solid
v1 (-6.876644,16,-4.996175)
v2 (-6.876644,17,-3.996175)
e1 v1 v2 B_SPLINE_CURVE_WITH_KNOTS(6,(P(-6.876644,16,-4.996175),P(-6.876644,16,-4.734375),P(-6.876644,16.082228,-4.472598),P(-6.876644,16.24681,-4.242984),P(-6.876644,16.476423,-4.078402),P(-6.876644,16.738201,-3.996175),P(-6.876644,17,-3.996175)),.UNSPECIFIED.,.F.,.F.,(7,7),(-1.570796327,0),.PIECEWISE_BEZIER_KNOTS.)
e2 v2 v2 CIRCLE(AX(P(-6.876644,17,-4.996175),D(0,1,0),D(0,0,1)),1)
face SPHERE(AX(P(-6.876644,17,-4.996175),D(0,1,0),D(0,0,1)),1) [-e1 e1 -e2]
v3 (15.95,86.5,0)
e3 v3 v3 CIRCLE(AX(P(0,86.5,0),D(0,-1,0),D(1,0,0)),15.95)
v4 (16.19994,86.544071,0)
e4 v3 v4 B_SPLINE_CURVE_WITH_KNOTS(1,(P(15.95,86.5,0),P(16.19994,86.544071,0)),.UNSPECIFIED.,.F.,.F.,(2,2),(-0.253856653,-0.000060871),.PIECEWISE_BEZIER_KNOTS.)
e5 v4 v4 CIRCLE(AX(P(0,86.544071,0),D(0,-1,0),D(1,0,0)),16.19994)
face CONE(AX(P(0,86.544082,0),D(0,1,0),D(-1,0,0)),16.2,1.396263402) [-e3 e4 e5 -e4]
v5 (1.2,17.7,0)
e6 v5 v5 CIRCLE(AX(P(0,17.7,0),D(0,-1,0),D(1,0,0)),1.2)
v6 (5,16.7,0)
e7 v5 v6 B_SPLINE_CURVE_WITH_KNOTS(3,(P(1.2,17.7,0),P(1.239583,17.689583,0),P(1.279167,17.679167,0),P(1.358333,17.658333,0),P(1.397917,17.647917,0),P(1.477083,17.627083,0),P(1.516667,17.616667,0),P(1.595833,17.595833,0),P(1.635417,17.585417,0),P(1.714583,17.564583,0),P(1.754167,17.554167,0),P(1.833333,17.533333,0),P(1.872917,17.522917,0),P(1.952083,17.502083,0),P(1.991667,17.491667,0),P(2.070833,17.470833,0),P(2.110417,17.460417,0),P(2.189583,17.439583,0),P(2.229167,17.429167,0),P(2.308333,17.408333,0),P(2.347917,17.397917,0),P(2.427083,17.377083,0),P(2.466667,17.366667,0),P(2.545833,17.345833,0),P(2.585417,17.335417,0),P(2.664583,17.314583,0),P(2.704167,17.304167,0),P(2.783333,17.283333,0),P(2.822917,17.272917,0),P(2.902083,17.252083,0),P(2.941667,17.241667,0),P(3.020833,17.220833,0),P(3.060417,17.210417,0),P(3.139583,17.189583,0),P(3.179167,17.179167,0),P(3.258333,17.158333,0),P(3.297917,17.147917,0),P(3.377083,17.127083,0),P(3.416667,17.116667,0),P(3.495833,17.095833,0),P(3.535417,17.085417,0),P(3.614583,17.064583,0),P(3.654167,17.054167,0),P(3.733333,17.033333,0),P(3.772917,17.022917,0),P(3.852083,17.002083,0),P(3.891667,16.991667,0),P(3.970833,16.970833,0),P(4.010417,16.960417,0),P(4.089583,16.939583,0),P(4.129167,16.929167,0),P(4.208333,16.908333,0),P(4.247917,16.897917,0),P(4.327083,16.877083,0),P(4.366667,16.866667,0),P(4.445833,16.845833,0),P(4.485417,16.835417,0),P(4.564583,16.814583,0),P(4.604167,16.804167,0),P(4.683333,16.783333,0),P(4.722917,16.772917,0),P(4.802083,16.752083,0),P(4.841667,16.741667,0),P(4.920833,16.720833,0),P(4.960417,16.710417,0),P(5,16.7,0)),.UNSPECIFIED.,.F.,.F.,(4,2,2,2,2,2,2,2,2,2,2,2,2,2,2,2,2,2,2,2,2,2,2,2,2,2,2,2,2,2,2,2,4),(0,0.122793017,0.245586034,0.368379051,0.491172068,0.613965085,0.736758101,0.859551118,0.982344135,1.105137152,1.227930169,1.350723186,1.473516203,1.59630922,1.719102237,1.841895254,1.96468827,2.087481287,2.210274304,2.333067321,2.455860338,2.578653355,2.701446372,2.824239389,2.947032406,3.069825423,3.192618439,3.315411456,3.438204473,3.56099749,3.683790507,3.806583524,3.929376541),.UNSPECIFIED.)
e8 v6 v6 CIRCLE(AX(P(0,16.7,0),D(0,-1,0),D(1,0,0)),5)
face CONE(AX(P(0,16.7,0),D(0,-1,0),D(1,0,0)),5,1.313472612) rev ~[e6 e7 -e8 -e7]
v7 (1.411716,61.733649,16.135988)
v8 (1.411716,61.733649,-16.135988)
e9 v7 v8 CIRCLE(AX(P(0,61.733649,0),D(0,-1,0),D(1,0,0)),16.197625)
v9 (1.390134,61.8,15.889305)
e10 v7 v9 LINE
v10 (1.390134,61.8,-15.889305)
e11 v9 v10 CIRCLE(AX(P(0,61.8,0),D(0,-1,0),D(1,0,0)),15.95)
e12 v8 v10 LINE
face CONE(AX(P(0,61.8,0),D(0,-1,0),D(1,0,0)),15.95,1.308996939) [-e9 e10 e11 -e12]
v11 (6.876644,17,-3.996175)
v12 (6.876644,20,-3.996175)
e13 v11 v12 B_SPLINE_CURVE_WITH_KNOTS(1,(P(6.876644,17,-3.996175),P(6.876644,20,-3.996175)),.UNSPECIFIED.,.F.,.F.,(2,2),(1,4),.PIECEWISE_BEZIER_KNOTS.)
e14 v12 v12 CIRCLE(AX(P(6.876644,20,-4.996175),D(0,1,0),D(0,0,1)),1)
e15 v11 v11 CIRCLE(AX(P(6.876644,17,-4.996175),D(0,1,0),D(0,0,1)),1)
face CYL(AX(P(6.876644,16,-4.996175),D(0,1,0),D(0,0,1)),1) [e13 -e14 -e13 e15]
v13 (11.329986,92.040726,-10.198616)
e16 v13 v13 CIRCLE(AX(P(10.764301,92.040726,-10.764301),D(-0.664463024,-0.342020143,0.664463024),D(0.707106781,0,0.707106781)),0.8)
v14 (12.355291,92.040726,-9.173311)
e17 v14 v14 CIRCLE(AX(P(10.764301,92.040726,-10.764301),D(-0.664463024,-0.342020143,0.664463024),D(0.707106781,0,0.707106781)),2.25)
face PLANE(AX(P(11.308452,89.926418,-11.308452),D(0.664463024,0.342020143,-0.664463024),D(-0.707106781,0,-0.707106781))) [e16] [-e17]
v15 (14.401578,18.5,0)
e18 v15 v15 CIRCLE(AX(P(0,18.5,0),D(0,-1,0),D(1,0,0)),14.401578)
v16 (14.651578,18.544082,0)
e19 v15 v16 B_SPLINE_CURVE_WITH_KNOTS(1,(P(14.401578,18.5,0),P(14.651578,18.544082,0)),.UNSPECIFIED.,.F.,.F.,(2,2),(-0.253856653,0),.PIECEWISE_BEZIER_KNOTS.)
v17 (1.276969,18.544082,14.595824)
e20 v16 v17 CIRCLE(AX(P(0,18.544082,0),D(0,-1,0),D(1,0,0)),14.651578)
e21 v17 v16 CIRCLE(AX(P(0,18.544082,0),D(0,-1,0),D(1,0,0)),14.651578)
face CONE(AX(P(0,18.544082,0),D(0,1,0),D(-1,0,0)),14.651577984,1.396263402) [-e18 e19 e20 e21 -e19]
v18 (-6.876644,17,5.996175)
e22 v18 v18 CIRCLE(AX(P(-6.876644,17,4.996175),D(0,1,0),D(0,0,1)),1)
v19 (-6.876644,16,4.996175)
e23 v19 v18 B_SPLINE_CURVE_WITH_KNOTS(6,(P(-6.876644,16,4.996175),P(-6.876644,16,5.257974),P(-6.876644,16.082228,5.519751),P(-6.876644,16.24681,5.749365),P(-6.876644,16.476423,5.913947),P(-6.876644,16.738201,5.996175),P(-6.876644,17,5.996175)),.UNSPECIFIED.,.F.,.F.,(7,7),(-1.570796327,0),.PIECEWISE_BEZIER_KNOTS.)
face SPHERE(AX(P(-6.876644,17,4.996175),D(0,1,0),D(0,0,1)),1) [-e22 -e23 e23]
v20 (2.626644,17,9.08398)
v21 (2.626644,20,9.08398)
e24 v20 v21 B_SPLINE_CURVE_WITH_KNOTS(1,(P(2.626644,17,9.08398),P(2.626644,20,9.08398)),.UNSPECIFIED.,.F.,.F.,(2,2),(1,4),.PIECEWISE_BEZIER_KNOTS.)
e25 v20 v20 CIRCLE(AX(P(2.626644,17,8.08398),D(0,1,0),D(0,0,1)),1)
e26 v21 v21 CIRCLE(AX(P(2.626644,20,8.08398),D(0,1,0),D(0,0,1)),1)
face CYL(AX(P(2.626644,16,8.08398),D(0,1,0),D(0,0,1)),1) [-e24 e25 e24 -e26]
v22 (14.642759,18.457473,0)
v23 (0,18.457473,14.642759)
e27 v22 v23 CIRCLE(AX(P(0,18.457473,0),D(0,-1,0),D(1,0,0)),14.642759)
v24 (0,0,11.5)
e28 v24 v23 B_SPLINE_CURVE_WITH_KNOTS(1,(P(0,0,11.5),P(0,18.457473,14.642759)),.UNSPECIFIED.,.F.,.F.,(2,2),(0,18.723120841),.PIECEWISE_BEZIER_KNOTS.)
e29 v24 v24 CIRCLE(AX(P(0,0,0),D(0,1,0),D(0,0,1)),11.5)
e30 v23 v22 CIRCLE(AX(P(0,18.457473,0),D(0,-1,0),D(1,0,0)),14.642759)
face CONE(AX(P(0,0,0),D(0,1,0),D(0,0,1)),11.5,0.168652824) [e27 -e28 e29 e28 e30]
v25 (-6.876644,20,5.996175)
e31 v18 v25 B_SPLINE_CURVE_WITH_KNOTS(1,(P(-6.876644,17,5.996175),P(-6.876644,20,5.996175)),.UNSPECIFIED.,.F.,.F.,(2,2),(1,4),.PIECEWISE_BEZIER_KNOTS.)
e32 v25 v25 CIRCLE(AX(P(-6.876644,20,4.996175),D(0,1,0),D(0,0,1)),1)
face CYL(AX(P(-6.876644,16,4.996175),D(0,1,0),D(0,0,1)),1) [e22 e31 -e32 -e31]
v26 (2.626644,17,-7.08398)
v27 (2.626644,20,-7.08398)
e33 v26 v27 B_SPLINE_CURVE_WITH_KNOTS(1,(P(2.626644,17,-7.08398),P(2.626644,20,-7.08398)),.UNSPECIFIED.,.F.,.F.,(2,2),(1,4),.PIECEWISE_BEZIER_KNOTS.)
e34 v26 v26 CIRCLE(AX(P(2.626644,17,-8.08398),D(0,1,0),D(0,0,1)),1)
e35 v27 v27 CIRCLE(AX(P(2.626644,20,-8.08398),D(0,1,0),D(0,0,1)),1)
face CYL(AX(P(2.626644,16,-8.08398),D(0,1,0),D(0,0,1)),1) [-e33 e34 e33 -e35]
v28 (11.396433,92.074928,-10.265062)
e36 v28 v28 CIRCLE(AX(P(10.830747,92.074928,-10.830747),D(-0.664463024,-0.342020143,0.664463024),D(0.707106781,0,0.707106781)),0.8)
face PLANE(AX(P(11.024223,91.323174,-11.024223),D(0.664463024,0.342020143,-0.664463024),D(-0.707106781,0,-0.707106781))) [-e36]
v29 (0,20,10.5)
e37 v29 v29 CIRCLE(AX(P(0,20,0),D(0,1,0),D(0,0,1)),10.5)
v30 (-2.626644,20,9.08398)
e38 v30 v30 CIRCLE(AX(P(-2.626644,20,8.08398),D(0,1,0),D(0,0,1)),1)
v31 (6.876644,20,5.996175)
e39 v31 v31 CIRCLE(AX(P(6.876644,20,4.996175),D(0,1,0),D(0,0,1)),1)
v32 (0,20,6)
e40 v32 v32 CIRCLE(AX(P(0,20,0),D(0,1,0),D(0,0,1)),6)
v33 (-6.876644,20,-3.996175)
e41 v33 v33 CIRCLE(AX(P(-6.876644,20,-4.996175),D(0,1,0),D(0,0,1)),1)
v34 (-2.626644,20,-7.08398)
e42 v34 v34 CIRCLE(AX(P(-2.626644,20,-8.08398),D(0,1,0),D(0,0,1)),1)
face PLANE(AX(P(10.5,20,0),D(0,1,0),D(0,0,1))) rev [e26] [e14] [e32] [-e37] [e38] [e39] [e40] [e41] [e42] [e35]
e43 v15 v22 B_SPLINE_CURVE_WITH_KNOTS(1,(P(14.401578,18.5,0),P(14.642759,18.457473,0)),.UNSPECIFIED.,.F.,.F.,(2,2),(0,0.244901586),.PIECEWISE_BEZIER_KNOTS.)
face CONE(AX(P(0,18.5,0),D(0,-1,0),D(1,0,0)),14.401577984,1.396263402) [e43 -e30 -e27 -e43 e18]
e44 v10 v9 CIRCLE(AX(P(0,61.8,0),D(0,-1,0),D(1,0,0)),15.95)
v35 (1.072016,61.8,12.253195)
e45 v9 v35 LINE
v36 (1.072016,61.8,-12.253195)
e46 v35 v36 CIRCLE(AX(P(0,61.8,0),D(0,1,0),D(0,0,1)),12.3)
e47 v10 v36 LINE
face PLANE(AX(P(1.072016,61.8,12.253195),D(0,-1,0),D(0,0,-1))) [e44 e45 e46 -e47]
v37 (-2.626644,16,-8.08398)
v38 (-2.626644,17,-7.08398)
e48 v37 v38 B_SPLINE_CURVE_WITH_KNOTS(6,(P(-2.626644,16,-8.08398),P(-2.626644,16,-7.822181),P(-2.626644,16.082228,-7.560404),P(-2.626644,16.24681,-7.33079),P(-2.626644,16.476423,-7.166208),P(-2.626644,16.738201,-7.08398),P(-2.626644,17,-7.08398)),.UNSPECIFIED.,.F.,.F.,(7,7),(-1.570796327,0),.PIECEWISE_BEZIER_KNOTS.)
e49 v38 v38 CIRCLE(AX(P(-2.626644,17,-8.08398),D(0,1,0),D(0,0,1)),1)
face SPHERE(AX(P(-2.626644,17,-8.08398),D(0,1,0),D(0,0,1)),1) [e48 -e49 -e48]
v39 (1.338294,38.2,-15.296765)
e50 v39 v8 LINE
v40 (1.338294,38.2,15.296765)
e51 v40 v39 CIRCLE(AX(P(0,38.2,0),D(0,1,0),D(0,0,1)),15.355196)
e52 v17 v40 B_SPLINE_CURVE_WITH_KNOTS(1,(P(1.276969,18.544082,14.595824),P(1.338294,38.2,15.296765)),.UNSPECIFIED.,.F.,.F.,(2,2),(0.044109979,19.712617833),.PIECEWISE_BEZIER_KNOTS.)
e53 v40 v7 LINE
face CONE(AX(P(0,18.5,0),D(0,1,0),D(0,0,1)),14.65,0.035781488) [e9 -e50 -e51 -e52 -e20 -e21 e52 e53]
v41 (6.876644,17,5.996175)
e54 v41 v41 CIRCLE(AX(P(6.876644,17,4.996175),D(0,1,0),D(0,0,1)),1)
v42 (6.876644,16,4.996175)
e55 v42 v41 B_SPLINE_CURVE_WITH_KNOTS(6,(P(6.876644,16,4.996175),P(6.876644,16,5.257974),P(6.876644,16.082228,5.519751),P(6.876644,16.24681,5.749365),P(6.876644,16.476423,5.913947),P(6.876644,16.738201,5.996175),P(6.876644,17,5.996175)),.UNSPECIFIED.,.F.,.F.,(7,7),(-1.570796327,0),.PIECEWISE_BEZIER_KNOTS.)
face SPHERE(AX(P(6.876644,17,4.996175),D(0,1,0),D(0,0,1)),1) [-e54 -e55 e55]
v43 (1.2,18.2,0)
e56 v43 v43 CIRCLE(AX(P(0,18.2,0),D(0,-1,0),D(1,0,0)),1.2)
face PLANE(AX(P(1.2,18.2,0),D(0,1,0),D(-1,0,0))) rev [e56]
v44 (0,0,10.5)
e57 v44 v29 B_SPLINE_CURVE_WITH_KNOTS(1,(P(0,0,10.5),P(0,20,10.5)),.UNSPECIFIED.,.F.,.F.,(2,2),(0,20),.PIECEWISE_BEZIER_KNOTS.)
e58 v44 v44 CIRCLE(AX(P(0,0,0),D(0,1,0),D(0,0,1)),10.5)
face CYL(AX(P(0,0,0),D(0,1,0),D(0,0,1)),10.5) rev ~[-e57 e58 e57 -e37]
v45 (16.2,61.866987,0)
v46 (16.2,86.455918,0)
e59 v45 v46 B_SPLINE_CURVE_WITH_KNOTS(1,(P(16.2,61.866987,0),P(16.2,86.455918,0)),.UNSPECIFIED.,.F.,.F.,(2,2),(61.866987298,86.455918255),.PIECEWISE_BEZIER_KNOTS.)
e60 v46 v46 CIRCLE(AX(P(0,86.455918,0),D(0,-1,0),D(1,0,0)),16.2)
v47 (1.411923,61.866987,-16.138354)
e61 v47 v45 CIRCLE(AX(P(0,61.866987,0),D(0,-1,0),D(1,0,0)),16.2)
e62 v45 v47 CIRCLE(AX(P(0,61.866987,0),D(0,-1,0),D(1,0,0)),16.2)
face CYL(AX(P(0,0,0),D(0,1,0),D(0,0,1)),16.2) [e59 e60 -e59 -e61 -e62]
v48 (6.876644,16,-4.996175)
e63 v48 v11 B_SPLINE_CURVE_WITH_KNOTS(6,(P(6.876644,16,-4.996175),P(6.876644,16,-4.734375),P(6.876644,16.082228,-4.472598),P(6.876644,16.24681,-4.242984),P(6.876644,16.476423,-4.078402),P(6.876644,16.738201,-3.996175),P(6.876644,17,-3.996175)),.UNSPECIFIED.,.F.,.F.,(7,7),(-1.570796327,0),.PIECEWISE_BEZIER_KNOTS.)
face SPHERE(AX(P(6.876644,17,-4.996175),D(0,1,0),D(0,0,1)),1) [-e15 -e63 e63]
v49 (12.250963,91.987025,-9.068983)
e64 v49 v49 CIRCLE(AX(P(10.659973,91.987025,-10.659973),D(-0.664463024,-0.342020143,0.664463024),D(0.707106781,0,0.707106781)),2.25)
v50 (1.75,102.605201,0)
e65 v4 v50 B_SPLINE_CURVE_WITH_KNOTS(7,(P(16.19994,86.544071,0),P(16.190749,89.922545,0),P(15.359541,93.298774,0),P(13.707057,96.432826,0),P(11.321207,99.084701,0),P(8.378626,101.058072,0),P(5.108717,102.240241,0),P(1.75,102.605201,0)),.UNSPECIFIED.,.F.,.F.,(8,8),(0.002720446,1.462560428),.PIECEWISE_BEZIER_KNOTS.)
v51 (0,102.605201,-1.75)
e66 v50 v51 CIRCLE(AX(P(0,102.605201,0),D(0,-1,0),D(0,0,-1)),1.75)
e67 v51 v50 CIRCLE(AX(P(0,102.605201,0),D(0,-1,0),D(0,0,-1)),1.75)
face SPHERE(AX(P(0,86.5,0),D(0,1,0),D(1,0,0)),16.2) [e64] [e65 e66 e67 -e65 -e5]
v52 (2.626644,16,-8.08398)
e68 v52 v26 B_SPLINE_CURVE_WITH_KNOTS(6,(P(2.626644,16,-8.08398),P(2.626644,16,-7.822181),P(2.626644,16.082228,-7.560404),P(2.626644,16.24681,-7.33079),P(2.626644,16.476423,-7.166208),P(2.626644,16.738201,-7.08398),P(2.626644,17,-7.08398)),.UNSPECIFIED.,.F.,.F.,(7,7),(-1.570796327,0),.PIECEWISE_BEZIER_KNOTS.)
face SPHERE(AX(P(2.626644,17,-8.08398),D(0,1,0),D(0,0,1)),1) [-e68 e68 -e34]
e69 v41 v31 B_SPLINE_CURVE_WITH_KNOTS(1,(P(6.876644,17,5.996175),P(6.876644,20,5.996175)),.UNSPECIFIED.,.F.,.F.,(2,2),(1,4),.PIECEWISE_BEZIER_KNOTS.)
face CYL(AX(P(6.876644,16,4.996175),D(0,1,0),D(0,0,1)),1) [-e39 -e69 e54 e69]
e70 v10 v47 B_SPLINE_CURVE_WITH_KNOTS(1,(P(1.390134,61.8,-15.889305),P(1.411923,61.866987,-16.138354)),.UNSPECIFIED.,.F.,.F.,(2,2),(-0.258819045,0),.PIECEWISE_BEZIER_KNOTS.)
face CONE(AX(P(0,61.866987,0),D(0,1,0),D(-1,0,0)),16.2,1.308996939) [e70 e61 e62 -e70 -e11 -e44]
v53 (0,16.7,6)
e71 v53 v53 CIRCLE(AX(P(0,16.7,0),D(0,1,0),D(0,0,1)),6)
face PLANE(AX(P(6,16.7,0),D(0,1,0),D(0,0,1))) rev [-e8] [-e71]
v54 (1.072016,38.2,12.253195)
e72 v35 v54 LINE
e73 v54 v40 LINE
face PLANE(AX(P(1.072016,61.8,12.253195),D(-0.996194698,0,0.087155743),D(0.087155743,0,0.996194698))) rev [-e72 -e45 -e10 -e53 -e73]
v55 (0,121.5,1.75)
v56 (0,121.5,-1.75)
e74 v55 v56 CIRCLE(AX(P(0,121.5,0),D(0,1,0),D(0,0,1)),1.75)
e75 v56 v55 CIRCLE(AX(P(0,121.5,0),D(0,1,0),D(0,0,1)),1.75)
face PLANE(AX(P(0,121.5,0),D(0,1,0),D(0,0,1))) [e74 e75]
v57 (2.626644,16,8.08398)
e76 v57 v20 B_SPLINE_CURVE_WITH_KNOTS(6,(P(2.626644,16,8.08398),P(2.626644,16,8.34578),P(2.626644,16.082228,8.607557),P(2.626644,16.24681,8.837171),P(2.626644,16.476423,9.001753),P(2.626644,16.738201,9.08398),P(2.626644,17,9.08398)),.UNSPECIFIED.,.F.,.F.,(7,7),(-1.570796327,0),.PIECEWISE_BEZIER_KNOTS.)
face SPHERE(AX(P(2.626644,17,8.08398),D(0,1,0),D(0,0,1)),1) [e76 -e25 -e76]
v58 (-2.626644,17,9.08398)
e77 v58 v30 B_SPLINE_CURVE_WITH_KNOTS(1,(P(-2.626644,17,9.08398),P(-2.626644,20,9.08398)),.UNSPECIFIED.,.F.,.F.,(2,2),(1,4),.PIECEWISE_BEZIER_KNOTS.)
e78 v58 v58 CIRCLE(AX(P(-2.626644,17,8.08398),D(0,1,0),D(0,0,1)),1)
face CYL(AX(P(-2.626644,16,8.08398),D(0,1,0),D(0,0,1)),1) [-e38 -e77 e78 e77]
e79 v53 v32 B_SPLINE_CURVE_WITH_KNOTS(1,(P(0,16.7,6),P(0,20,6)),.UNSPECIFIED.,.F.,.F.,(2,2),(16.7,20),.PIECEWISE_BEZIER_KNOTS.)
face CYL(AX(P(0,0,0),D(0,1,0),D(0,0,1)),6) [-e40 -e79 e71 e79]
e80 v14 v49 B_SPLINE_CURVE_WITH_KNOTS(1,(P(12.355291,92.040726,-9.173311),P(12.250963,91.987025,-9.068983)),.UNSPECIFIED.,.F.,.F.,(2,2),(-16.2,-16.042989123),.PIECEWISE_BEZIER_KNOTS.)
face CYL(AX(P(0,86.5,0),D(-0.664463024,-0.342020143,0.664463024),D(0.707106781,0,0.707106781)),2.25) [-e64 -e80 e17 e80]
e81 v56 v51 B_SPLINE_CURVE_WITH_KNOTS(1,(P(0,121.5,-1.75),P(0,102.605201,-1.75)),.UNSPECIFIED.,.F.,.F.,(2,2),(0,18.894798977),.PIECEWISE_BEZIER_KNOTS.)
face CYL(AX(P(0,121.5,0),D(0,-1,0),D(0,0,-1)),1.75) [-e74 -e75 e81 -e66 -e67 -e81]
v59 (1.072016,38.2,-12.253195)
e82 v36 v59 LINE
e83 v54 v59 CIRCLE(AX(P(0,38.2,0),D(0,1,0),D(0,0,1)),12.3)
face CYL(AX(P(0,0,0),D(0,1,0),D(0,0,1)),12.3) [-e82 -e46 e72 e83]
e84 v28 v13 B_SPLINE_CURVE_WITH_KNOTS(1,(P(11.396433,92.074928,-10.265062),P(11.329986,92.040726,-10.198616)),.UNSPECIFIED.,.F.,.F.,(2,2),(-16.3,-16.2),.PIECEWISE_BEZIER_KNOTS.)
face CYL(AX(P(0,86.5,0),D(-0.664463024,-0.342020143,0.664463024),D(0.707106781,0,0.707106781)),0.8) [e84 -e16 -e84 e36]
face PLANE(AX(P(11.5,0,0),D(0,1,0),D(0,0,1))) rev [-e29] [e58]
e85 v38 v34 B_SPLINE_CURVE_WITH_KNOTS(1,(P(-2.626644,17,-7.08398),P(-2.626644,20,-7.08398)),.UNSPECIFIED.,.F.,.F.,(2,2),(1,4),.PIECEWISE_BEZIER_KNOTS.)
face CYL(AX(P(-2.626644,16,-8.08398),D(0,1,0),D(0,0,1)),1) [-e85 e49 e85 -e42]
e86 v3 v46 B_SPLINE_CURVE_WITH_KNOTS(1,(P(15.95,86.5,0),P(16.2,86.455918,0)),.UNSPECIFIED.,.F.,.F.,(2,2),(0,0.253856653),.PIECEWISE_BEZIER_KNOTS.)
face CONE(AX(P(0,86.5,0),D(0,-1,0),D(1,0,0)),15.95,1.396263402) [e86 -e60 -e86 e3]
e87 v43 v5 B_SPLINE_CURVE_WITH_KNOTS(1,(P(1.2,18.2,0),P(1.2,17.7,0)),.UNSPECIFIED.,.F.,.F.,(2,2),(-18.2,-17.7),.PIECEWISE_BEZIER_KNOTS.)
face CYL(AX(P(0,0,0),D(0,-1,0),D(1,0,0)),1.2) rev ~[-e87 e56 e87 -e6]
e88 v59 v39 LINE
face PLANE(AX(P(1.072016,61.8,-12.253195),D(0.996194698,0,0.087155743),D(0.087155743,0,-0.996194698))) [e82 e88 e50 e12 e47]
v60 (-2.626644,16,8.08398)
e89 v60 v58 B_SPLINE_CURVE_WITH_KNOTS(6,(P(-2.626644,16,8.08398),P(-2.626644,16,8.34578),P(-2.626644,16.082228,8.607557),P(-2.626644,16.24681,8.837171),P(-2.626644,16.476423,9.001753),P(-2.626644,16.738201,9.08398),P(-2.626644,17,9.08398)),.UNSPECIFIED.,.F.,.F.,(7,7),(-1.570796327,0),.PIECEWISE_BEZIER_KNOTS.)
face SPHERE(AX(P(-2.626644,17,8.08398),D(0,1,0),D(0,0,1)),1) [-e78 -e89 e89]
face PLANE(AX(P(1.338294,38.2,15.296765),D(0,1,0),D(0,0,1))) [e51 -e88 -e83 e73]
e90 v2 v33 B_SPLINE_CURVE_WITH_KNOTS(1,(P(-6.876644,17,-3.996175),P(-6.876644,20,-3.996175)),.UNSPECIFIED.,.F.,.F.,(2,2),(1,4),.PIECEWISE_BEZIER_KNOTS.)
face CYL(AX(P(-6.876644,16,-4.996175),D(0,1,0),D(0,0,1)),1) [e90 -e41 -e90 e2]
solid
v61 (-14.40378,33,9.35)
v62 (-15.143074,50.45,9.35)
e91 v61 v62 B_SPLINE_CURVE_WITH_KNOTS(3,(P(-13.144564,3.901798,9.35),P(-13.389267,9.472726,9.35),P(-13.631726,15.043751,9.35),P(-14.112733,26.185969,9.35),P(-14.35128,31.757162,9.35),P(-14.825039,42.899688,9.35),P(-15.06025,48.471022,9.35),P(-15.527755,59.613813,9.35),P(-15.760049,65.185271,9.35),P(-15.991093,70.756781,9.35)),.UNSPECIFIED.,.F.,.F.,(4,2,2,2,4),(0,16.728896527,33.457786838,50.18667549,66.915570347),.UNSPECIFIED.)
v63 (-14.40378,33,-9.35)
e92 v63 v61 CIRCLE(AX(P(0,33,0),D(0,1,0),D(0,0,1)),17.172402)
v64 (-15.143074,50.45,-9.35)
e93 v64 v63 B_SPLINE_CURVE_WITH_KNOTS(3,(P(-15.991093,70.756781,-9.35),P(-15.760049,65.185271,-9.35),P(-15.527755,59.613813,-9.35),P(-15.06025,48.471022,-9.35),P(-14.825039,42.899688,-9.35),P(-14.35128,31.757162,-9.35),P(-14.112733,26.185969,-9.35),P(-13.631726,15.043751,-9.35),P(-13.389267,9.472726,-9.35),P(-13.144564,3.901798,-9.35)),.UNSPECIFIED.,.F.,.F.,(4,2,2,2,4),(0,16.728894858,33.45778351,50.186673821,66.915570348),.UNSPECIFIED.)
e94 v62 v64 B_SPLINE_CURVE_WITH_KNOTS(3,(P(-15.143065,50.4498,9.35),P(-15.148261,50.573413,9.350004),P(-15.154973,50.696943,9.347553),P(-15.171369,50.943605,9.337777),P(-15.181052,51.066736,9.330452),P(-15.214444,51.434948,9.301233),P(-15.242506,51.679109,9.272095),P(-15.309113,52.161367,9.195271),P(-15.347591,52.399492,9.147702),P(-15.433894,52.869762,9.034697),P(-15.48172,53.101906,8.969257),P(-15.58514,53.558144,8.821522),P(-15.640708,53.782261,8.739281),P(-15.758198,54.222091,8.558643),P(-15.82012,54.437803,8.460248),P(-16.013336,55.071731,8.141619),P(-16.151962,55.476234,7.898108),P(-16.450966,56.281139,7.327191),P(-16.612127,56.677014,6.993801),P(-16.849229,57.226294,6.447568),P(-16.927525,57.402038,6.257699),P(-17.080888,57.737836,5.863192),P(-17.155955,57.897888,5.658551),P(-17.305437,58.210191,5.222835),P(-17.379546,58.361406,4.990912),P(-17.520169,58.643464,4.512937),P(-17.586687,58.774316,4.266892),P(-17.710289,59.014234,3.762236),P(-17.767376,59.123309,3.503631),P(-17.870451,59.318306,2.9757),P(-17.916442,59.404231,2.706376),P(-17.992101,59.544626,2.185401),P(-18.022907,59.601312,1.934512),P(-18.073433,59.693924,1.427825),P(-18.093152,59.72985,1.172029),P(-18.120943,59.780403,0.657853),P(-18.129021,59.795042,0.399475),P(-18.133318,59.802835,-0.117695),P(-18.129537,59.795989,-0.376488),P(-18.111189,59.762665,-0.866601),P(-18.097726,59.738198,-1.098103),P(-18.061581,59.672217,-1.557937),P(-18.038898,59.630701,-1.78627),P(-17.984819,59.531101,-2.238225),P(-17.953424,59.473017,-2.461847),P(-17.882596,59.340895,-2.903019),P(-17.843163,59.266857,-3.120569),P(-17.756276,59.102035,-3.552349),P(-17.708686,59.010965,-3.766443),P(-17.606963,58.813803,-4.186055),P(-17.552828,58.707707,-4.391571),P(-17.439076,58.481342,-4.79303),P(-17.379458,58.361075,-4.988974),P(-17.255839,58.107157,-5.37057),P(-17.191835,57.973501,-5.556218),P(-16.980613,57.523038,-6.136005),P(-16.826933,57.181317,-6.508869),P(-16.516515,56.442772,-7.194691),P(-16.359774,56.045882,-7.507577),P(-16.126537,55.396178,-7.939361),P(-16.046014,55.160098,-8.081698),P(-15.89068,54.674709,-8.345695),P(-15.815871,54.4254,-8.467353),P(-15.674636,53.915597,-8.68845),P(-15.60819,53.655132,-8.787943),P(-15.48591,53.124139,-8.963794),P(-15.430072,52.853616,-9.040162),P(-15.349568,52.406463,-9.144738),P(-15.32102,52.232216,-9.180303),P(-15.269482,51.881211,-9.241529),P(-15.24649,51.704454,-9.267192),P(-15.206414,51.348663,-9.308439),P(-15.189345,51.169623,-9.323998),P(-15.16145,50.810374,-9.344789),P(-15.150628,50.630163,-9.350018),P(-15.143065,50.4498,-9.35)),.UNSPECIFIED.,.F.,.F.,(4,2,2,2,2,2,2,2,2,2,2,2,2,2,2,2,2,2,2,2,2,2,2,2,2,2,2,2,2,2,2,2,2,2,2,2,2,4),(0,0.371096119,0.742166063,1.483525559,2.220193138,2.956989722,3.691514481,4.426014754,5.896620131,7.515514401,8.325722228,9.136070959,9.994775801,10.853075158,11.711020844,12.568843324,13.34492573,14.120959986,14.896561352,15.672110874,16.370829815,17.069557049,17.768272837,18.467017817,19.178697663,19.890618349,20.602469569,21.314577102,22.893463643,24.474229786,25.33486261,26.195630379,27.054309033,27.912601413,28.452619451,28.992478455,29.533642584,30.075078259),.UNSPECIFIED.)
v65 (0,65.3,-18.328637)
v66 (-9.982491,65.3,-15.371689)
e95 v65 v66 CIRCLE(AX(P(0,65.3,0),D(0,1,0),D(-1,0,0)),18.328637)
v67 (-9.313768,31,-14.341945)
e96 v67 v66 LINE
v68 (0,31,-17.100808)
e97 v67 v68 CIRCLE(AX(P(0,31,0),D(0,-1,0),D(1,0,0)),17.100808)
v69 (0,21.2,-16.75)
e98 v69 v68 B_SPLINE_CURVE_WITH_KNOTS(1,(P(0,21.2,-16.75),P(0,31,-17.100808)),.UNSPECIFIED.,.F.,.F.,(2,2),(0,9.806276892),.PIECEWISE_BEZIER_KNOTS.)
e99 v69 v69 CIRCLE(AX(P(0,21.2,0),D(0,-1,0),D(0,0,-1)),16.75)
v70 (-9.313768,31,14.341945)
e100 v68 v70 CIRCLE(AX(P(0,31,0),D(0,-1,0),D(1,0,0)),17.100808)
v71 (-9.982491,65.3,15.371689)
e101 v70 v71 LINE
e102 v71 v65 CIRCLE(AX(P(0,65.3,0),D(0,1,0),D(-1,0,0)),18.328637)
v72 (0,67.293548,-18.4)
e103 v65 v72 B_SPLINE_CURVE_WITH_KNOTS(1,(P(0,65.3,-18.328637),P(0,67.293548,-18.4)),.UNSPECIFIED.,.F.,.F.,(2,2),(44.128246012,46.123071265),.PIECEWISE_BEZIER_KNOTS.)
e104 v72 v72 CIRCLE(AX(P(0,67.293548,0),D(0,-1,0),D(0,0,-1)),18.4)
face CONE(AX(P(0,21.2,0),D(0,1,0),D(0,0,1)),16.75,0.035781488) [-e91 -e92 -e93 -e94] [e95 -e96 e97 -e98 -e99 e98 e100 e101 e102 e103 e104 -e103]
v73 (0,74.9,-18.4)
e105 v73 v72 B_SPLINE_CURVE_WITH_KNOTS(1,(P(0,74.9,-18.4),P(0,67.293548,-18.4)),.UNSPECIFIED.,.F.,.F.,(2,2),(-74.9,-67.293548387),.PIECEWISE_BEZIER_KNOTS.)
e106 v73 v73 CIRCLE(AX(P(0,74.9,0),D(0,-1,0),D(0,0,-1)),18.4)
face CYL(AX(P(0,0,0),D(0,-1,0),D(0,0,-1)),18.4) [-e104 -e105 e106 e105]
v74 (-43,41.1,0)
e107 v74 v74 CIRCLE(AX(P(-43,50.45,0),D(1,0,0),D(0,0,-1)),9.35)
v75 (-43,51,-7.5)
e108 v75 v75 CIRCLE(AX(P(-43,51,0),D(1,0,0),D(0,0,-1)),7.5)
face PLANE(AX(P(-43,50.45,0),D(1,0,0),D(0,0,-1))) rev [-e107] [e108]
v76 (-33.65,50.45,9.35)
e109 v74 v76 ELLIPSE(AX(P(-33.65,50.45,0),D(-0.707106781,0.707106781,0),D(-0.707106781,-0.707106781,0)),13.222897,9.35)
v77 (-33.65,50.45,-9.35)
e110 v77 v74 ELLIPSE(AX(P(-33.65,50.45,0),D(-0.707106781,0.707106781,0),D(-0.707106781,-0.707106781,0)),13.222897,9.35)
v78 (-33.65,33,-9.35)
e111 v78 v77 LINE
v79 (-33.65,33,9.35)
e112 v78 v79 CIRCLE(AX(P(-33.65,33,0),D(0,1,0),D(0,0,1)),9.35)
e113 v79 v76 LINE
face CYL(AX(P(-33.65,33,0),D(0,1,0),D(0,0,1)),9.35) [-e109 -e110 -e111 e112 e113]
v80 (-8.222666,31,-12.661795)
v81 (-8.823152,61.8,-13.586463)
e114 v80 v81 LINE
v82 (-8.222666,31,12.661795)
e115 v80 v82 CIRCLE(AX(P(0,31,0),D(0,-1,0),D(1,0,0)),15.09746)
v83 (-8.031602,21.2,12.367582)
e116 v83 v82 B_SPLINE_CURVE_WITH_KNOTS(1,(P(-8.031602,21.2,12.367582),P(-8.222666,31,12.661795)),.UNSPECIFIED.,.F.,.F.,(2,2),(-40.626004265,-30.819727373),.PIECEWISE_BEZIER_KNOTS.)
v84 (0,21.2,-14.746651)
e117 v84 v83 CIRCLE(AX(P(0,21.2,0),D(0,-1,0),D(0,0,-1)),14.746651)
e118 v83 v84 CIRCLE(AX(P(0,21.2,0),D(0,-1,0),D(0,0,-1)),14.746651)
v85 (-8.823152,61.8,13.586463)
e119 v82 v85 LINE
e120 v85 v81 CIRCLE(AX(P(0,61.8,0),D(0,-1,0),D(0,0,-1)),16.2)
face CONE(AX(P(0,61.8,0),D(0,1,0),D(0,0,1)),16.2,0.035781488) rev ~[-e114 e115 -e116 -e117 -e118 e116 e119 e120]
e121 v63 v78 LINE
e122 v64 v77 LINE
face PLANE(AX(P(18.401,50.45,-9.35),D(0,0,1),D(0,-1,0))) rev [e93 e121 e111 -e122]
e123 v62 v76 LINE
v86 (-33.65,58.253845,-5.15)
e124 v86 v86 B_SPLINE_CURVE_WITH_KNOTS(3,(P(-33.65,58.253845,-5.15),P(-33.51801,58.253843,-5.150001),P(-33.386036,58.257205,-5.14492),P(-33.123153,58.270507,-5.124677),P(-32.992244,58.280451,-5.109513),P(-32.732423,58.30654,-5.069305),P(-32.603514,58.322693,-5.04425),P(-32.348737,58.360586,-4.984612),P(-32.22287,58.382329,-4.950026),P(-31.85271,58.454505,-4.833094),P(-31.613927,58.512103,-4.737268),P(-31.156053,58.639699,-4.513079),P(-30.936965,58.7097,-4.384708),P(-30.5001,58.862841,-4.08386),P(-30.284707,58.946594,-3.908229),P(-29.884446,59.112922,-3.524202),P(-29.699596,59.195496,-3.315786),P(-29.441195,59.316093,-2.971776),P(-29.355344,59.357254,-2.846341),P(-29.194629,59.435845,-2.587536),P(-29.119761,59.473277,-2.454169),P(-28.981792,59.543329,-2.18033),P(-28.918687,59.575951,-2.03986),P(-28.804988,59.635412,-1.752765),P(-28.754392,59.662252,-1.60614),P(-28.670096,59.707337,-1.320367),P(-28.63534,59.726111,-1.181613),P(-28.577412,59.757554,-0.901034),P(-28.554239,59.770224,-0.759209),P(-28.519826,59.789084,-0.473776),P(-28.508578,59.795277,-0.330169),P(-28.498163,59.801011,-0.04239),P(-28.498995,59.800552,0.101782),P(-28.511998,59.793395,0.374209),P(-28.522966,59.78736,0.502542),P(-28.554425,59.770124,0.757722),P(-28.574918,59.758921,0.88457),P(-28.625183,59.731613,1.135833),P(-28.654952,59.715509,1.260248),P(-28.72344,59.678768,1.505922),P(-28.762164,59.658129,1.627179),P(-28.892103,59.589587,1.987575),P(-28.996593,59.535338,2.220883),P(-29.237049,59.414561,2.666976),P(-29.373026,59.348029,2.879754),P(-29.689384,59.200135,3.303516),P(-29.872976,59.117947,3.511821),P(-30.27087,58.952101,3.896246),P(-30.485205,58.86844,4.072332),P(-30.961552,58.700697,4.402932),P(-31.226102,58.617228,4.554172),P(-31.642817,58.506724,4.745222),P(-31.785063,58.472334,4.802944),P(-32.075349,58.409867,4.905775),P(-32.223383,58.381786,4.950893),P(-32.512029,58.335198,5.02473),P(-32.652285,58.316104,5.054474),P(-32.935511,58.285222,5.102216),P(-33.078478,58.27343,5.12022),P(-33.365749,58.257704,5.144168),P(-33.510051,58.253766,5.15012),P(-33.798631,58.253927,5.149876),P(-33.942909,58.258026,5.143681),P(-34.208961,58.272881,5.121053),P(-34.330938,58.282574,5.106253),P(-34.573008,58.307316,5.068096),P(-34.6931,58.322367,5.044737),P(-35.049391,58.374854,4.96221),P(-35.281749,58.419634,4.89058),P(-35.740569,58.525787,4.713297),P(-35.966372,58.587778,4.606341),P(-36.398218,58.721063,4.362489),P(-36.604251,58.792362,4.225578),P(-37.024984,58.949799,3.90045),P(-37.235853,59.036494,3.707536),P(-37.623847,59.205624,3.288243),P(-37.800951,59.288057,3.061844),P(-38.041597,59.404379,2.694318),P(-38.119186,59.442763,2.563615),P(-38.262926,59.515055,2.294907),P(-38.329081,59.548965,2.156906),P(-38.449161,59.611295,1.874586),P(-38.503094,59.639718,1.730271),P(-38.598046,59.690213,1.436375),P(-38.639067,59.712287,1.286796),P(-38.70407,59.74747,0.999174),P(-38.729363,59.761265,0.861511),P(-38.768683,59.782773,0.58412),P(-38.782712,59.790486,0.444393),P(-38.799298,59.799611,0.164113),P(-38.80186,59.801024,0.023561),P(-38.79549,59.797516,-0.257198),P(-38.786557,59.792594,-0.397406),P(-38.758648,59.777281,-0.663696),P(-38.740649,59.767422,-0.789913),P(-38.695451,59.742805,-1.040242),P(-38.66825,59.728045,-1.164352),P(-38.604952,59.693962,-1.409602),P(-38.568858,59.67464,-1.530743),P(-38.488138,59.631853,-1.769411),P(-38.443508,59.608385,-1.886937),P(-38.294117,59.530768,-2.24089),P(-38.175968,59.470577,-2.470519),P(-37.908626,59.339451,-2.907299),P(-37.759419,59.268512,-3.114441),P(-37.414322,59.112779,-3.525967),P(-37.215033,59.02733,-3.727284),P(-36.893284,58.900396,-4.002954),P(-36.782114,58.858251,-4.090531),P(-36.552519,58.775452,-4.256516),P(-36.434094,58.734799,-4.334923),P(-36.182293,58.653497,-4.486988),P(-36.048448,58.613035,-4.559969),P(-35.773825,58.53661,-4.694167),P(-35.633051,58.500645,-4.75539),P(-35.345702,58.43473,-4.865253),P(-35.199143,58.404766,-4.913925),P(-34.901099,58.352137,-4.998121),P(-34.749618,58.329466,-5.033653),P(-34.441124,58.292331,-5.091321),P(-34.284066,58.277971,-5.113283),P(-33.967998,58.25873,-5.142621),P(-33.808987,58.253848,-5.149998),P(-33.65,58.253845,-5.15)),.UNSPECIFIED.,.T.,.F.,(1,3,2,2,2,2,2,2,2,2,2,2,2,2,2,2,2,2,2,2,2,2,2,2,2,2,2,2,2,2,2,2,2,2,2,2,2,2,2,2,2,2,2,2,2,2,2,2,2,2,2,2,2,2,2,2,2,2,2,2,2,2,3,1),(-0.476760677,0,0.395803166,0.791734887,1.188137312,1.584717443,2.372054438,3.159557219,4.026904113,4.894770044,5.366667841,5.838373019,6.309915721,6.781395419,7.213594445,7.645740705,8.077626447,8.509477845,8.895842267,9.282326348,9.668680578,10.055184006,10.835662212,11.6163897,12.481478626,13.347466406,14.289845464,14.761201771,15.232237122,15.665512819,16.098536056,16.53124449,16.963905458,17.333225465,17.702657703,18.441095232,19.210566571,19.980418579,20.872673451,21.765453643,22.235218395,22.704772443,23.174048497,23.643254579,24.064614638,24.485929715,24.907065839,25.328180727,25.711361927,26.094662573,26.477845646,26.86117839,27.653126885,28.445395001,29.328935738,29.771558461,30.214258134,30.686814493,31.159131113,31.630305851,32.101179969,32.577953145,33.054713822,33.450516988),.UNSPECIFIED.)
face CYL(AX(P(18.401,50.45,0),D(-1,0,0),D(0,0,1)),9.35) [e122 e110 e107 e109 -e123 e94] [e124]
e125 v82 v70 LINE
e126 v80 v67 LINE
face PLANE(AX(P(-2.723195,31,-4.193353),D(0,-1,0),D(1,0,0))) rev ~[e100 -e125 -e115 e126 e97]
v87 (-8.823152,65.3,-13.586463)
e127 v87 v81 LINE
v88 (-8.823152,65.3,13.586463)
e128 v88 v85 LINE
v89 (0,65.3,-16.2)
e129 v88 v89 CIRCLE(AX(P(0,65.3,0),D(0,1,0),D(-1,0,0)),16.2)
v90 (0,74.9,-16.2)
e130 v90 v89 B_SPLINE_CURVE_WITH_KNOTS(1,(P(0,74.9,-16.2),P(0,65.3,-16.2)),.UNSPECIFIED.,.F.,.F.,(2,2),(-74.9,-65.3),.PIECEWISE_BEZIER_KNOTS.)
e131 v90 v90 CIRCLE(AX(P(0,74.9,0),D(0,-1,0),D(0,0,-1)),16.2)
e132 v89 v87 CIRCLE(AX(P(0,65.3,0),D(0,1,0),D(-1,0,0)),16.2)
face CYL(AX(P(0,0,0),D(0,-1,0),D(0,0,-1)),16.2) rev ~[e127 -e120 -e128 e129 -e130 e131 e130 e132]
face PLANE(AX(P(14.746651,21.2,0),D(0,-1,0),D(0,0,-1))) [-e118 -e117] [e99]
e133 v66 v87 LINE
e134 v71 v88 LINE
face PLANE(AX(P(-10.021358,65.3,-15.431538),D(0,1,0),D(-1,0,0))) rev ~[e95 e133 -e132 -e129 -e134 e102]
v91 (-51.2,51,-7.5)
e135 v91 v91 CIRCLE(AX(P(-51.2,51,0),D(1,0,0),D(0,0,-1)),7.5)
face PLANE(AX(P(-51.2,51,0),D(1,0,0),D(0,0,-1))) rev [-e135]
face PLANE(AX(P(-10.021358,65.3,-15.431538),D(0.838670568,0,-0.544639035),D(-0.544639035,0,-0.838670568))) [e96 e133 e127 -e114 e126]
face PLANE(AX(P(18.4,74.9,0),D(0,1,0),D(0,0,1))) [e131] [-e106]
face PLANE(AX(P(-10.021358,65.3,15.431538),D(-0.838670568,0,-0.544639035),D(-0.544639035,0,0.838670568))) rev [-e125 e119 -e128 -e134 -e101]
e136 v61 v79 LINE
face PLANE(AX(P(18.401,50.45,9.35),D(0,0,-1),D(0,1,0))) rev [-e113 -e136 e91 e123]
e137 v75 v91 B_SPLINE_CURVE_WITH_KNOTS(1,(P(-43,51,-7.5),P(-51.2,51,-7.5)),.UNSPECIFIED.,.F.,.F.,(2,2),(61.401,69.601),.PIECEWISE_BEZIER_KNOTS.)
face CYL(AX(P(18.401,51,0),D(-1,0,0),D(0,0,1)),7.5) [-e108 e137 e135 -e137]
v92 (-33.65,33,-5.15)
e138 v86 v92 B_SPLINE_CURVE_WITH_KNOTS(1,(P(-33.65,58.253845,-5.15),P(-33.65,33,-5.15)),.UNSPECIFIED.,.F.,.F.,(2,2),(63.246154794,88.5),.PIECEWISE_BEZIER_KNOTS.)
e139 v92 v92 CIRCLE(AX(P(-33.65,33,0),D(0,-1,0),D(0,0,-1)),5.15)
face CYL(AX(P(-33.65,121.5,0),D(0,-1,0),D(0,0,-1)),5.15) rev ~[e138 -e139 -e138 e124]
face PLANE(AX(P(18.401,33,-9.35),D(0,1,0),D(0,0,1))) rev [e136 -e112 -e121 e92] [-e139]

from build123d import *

# Parameters (mm, degrees)
CUT_REVOLVE1_ANGLE       = 170
SKETCH10_R               = 1.75
BOSS_EXTRUDE3_DEPTH      = 35
SKETCH15_R               = 1
BOSS_EXTRUDE4_DEPTH      = 4
FILLET2_R                = 1
CIRPATTERN1_COUNT        = 10
FILLET2_OF_CIRPATTERN1_R = 1
SKETCH4_W                = 13.4
SKETCH4_H                = 34.3
CUT_REVOLVE2_ANGLE       = 246
BOSS_EXTRUDE1_REACH      = 139.371
FILLET1_R                = 9.35
SKETCH7_R                = 5.15
CUT_EXTRUDE1_DEPTH       = 101.099001055
BOSS_EXTRUDE2_REACH      = 143.227
SKETCH9_R                = 7.5


with BuildPart() as part:
    # Sketch1 → Revolve1 (revolve)
    with BuildSketch(Plane.XY, mode=Mode.PRIVATE) as revolve1_sk:
        with BuildLine():
            Line((11.5, 0), (14.65, 18.5))
            Line((14.65, 18.5), (16.2, 61.8))
            Line((16.2, 61.8), (16.2, 86.5))
            ThreePointArc((16.2, 86.5), (11.455129855, 97.955129855), (0, 102.7))
            Line((0, 102.7), (0, 16.7))
            Line((0, 16.7), (6, 16.7))
            Line((6, 16.7), (6, 20))
            Line((6, 20), (10.5, 20))
            Line((10.5, 20), (10.5, 0))
            Line((10.5, 0), (11.5, 0))
        make_face()
    revolve(revolve1_sk.sketch.rotate(Axis((0, 0, 0), (0, -1, 0)), 90), axis=Axis((0, 0, 0), (0, -1, 0)))

    # Sketch2 → Cut-Revolve1 (revolve, symmetric, cut)
    with BuildSketch(Plane.XY) as cut_revolve1_sk:
        Polygon((16.2, 61.8), (15.355196305, 38.2), (12.3, 38.2), (12.3, 61.8), align=None)
    revolve(axis=Axis((0, 0, 0), (0, -1, 0)), revolution_arc=CUT_REVOLVE1_ANGLE / 2, mode=Mode.SUBTRACT)
    revolve(cut_revolve1_sk.sketch, axis=Axis((0, 0, 0), (0, 1, 0)), revolution_arc=CUT_REVOLVE1_ANGLE / 2, mode=Mode.SUBTRACT)

    # Sketch10 → Boss-Extrude3 (add)
    with BuildSketch(Plane(origin=(0, 86.5, 0), x_dir=(1, 0, 0), z_dir=(0, 1, 0))):
        with Locations(Location((0, 0, 0), (0, 0, 270))):
            Circle(SKETCH10_R)
    extrude(amount=BOSS_EXTRUDE3_DEPTH)

    # Sketch12 → Cut-Revolve3 (revolve, cut)
    with BuildSketch(Plane.XY):
        Polygon((5, 16.7), (1.2, 17.7), (1.2, 18.2), (0, 18.2), (0, 16.7), align=None)
    revolve(axis=Axis((0, 0, 0), (0, 1, 0)), mode=Mode.SUBTRACT)

    # Sketch14 → Cut-Revolve4 (revolve, cut)
    with BuildSketch(Plane.XY):
        Polygon((16.2, 61.866987298), (15.95, 61.8), (16.2, 61.733012702), align=None)
        Polygon((14.651577984, 18.544081745), (14.401577984, 18.5), (14.651577984, 18.455918255), align=None)
        Polygon((16.2, 86.455918255), (15.95, 86.5), (16.2, 86.544081745), align=None)
    revolve(axis=Axis((0, 16.7, 0), (0, 1, 0)), mode=Mode.SUBTRACT)

    # Sketch15 → Boss-Extrude4 (add)
    with BuildSketch(Plane.XZ.offset(-20)):
        with Locations(Location((-6.876644452, -4.996174644, 0), (0, 0, 90))):
            Circle(SKETCH15_R)
    boss_extrude4 = extrude(amount=BOSS_EXTRUDE4_DEPTH)

    # Fillet2
    fillet2_edges = [part.edges().sort_by_distance(p)[0] for p in [
        (-6.876644452, 16, -5.996174644),
    ]]
    fillet(fillet2_edges, radius=FILLET2_R)

    # CirPattern1: Boss-Extrude4 ×10 about axis, 2 skipped
    cirpattern1_axis = Axis((0, -23.883118438, 0), (0, 1, 0))
    add([boss_extrude4.rotate(cirpattern1_axis, i * 360 / CIRPATTERN1_COUNT) for i in range(1, CIRPATTERN1_COUNT) if i not in (1, 6)])

    # Fillet2 of CirPattern1
    fillet2_of_cirpattern1_edges = [part.edges().sort_by_distance(p)[0] for p in [
        (-7.827700968, 16, 4.68715765),
        (-3.577700968, 16, 8.392997383),
        (2.0388592, 16, 8.892997383),
        (6.876644452, 16, 5.996174644),
        (7.827700968, 16, -4.68715765),
        (3.577700968, 16, -8.392997383),
        (-2.0388592, 16, -8.892997383),
    ]]
    fillet(fillet2_of_cirpattern1_edges, radius=FILLET2_OF_CIRPATTERN1_R)

    # Sketch11 → Revolve3 (revolve)
    with BuildSketch(Plane(origin=(0, 0, 0), x_dir=(0.7071067811865488, 0, -0.7071067811865464), z_dir=(0.7071067811865464, 0, 0.7071067811865488)), mode=Mode.PRIVATE) as revolve3_sk:
        Polygon((15.052873158, 89.584397782), (15.992565779, 89.926417925), (15.496636571, 91.288972225), (15.590605833, 91.32317424), (15.316989719, 92.074928336), (15.223020457, 92.040726322), (14.283327836, 91.698706179), align=None)
    revolve(revolve3_sk.sketch.rotate(Axis((0, 86.5, 0), (0.6644630243886773, 0.34202014332566283, -0.6644630243886751)), 270), axis=Axis((0, 86.5, 0), (0.6644630243886773, 0.34202014332566283, -0.6644630243886751)))


with BuildPart() as body_2:
    # Sketch3 → Revolve2 (revolve)
    with BuildSketch(Plane.XY, mode=Mode.PRIVATE) as revolve2_sk:
        Polygon((16.75, 21.2), (18.4, 67.293548387), (18.4, 74.9), (16.2, 74.9), (16.2, 61.8), (14.74665127, 21.2), align=None)
    revolve(revolve2_sk.sketch.rotate(Axis((0, 0, 0), (0, 1, 0)), 90), axis=Axis((0, 0, 0), (0, 1, 0)))

    # Sketch4 → Cut-Revolve2 (revolve, symmetric, cut)
    with BuildSketch(Plane.XY) as cut_revolve2_sk:
        with Locations((11.7, 48.15)):
            Rectangle(SKETCH4_W, SKETCH4_H)
    revolve(axis=Axis((0, 16.7, 0), (0, 1, 0)), revolution_arc=CUT_REVOLVE2_ANGLE / 2, mode=Mode.SUBTRACT)
    revolve(cut_revolve2_sk.sketch, axis=Axis((0, 16.7, 0), (0, -1, 0)), revolution_arc=CUT_REVOLVE2_ANGLE / 2, mode=Mode.SUBTRACT)

    # Boss-Extrude1: up to this cone (the profile starts outside it)
    boss_extrude1_end = Plane(origin=(0, 45.484563, 0), z_dir=(0, 1, 0)) * Cone(11.981664987, 23.256952687, 314.980617674, mode=Mode.PRIVATE)
    # Sketch6 → Boss-Extrude1 (add, up to the surface)
    with BuildSketch(Plane(origin=(-43, 0, 0), x_dir=(0, 0, -1), z_dir=(1, 0, 0)), mode=Mode.PRIVATE) as boss_extrude1_sk1:
        with BuildLine():
            Line((9.35, 50.45), (9.35, 33))
            Line((9.35, 33), (-9.35, 33))
            Line((-9.35, 33), (-9.35, 50.45))
            ThreePointArc((-9.35, 50.45), (0, 59.8), (9.35, 50.45))
        make_face()
    boss_extrude1_tool1 = extrude(boss_extrude1_sk1.sketch, amount=BOSS_EXTRUDE1_REACH, mode=Mode.PRIVATE) - boss_extrude1_end
    add(boss_extrude1_tool1.solids().sort_by_distance((-43, 45.484563, 0))[0])

    # Fillet1
    # the kernel refuses this fillet: 9.35 mm, written as the material it takes off along each edge
    with BuildSketch(Plane(origin=(-43, 50.45, -9.35), x_dir=(1, 0, 0), z_dir=(0, -1, 0))) as fillet1_piece_1_section:
        with BuildLine():
            CenterArc((FILLET1_R, FILLET1_R), FILLET1_R, 180, 90)
            Line((0, FILLET1_R), (0, 0))
            Line((0, 0), (FILLET1_R, 0))
        make_face()
    fillet1_piece_1 = extrude(amount=40.825, mode=Mode.PRIVATE)
    fillet1_piece_1 = fillet1_piece_1 - Plane(origin=(-40.713611531, 50.45, 0), x_dir=(0, 0, 1), z_dir=(-1, 0, 0)) * Cylinder(9.35, 120, mode=Mode.PRIVATE)
    add(fillet1_piece_1, mode=Mode.SUBTRACT)
    with BuildSketch(Plane(origin=(-43, 9.625, 9.35), x_dir=(1, 0, 0), z_dir=(0, 1, 0))) as fillet1_piece_2_section:
        with BuildLine():
            CenterArc((FILLET1_R, FILLET1_R), FILLET1_R, 180, 90)
            Line((0, FILLET1_R), (0, 0))
            Line((0, 0), (FILLET1_R, 0))
        make_face()
    fillet1_piece_2 = extrude(amount=40.825, mode=Mode.PRIVATE)
    fillet1_piece_2 = fillet1_piece_2 - Plane(origin=(-40.713611532, 50.45, 0), x_dir=(0, 0, 1), z_dir=(-1, 0, 0)) * Cylinder(9.35, 120, mode=Mode.PRIVATE)
    add(fillet1_piece_2, mode=Mode.SUBTRACT)

    # Sketch7 → Cut-Extrude1 (cut, through all)
    with BuildSketch(Plane.XZ.offset(-33)):
        with Locations(Location((-33.65, 0, 0), (0, 0, 270))):
            Circle(SKETCH7_R)
    extrude(amount=-CUT_EXTRUDE1_DEPTH, mode=Mode.SUBTRACT)

    # Sketch9 → Boss-Extrude2 (add, up to next)
    with BuildSketch(Plane(origin=(-51.2, 0, 0), x_dir=(0, 0, -1), z_dir=(1, 0, 0)), mode=Mode.PRIVATE) as boss_extrude2_sk1:
        with Locations((0, 51)):
            Circle(SKETCH9_R)
    boss_extrude2_tool1 = extrude(boss_extrude2_sk1.sketch, amount=BOSS_EXTRUDE2_REACH, mode=Mode.PRIVATE) - body_2.part
    add(boss_extrude2_tool1.solids().sort_by_distance((-51.2, 51, 0))[0])


solid = Compound([part.part, body_2.part])
